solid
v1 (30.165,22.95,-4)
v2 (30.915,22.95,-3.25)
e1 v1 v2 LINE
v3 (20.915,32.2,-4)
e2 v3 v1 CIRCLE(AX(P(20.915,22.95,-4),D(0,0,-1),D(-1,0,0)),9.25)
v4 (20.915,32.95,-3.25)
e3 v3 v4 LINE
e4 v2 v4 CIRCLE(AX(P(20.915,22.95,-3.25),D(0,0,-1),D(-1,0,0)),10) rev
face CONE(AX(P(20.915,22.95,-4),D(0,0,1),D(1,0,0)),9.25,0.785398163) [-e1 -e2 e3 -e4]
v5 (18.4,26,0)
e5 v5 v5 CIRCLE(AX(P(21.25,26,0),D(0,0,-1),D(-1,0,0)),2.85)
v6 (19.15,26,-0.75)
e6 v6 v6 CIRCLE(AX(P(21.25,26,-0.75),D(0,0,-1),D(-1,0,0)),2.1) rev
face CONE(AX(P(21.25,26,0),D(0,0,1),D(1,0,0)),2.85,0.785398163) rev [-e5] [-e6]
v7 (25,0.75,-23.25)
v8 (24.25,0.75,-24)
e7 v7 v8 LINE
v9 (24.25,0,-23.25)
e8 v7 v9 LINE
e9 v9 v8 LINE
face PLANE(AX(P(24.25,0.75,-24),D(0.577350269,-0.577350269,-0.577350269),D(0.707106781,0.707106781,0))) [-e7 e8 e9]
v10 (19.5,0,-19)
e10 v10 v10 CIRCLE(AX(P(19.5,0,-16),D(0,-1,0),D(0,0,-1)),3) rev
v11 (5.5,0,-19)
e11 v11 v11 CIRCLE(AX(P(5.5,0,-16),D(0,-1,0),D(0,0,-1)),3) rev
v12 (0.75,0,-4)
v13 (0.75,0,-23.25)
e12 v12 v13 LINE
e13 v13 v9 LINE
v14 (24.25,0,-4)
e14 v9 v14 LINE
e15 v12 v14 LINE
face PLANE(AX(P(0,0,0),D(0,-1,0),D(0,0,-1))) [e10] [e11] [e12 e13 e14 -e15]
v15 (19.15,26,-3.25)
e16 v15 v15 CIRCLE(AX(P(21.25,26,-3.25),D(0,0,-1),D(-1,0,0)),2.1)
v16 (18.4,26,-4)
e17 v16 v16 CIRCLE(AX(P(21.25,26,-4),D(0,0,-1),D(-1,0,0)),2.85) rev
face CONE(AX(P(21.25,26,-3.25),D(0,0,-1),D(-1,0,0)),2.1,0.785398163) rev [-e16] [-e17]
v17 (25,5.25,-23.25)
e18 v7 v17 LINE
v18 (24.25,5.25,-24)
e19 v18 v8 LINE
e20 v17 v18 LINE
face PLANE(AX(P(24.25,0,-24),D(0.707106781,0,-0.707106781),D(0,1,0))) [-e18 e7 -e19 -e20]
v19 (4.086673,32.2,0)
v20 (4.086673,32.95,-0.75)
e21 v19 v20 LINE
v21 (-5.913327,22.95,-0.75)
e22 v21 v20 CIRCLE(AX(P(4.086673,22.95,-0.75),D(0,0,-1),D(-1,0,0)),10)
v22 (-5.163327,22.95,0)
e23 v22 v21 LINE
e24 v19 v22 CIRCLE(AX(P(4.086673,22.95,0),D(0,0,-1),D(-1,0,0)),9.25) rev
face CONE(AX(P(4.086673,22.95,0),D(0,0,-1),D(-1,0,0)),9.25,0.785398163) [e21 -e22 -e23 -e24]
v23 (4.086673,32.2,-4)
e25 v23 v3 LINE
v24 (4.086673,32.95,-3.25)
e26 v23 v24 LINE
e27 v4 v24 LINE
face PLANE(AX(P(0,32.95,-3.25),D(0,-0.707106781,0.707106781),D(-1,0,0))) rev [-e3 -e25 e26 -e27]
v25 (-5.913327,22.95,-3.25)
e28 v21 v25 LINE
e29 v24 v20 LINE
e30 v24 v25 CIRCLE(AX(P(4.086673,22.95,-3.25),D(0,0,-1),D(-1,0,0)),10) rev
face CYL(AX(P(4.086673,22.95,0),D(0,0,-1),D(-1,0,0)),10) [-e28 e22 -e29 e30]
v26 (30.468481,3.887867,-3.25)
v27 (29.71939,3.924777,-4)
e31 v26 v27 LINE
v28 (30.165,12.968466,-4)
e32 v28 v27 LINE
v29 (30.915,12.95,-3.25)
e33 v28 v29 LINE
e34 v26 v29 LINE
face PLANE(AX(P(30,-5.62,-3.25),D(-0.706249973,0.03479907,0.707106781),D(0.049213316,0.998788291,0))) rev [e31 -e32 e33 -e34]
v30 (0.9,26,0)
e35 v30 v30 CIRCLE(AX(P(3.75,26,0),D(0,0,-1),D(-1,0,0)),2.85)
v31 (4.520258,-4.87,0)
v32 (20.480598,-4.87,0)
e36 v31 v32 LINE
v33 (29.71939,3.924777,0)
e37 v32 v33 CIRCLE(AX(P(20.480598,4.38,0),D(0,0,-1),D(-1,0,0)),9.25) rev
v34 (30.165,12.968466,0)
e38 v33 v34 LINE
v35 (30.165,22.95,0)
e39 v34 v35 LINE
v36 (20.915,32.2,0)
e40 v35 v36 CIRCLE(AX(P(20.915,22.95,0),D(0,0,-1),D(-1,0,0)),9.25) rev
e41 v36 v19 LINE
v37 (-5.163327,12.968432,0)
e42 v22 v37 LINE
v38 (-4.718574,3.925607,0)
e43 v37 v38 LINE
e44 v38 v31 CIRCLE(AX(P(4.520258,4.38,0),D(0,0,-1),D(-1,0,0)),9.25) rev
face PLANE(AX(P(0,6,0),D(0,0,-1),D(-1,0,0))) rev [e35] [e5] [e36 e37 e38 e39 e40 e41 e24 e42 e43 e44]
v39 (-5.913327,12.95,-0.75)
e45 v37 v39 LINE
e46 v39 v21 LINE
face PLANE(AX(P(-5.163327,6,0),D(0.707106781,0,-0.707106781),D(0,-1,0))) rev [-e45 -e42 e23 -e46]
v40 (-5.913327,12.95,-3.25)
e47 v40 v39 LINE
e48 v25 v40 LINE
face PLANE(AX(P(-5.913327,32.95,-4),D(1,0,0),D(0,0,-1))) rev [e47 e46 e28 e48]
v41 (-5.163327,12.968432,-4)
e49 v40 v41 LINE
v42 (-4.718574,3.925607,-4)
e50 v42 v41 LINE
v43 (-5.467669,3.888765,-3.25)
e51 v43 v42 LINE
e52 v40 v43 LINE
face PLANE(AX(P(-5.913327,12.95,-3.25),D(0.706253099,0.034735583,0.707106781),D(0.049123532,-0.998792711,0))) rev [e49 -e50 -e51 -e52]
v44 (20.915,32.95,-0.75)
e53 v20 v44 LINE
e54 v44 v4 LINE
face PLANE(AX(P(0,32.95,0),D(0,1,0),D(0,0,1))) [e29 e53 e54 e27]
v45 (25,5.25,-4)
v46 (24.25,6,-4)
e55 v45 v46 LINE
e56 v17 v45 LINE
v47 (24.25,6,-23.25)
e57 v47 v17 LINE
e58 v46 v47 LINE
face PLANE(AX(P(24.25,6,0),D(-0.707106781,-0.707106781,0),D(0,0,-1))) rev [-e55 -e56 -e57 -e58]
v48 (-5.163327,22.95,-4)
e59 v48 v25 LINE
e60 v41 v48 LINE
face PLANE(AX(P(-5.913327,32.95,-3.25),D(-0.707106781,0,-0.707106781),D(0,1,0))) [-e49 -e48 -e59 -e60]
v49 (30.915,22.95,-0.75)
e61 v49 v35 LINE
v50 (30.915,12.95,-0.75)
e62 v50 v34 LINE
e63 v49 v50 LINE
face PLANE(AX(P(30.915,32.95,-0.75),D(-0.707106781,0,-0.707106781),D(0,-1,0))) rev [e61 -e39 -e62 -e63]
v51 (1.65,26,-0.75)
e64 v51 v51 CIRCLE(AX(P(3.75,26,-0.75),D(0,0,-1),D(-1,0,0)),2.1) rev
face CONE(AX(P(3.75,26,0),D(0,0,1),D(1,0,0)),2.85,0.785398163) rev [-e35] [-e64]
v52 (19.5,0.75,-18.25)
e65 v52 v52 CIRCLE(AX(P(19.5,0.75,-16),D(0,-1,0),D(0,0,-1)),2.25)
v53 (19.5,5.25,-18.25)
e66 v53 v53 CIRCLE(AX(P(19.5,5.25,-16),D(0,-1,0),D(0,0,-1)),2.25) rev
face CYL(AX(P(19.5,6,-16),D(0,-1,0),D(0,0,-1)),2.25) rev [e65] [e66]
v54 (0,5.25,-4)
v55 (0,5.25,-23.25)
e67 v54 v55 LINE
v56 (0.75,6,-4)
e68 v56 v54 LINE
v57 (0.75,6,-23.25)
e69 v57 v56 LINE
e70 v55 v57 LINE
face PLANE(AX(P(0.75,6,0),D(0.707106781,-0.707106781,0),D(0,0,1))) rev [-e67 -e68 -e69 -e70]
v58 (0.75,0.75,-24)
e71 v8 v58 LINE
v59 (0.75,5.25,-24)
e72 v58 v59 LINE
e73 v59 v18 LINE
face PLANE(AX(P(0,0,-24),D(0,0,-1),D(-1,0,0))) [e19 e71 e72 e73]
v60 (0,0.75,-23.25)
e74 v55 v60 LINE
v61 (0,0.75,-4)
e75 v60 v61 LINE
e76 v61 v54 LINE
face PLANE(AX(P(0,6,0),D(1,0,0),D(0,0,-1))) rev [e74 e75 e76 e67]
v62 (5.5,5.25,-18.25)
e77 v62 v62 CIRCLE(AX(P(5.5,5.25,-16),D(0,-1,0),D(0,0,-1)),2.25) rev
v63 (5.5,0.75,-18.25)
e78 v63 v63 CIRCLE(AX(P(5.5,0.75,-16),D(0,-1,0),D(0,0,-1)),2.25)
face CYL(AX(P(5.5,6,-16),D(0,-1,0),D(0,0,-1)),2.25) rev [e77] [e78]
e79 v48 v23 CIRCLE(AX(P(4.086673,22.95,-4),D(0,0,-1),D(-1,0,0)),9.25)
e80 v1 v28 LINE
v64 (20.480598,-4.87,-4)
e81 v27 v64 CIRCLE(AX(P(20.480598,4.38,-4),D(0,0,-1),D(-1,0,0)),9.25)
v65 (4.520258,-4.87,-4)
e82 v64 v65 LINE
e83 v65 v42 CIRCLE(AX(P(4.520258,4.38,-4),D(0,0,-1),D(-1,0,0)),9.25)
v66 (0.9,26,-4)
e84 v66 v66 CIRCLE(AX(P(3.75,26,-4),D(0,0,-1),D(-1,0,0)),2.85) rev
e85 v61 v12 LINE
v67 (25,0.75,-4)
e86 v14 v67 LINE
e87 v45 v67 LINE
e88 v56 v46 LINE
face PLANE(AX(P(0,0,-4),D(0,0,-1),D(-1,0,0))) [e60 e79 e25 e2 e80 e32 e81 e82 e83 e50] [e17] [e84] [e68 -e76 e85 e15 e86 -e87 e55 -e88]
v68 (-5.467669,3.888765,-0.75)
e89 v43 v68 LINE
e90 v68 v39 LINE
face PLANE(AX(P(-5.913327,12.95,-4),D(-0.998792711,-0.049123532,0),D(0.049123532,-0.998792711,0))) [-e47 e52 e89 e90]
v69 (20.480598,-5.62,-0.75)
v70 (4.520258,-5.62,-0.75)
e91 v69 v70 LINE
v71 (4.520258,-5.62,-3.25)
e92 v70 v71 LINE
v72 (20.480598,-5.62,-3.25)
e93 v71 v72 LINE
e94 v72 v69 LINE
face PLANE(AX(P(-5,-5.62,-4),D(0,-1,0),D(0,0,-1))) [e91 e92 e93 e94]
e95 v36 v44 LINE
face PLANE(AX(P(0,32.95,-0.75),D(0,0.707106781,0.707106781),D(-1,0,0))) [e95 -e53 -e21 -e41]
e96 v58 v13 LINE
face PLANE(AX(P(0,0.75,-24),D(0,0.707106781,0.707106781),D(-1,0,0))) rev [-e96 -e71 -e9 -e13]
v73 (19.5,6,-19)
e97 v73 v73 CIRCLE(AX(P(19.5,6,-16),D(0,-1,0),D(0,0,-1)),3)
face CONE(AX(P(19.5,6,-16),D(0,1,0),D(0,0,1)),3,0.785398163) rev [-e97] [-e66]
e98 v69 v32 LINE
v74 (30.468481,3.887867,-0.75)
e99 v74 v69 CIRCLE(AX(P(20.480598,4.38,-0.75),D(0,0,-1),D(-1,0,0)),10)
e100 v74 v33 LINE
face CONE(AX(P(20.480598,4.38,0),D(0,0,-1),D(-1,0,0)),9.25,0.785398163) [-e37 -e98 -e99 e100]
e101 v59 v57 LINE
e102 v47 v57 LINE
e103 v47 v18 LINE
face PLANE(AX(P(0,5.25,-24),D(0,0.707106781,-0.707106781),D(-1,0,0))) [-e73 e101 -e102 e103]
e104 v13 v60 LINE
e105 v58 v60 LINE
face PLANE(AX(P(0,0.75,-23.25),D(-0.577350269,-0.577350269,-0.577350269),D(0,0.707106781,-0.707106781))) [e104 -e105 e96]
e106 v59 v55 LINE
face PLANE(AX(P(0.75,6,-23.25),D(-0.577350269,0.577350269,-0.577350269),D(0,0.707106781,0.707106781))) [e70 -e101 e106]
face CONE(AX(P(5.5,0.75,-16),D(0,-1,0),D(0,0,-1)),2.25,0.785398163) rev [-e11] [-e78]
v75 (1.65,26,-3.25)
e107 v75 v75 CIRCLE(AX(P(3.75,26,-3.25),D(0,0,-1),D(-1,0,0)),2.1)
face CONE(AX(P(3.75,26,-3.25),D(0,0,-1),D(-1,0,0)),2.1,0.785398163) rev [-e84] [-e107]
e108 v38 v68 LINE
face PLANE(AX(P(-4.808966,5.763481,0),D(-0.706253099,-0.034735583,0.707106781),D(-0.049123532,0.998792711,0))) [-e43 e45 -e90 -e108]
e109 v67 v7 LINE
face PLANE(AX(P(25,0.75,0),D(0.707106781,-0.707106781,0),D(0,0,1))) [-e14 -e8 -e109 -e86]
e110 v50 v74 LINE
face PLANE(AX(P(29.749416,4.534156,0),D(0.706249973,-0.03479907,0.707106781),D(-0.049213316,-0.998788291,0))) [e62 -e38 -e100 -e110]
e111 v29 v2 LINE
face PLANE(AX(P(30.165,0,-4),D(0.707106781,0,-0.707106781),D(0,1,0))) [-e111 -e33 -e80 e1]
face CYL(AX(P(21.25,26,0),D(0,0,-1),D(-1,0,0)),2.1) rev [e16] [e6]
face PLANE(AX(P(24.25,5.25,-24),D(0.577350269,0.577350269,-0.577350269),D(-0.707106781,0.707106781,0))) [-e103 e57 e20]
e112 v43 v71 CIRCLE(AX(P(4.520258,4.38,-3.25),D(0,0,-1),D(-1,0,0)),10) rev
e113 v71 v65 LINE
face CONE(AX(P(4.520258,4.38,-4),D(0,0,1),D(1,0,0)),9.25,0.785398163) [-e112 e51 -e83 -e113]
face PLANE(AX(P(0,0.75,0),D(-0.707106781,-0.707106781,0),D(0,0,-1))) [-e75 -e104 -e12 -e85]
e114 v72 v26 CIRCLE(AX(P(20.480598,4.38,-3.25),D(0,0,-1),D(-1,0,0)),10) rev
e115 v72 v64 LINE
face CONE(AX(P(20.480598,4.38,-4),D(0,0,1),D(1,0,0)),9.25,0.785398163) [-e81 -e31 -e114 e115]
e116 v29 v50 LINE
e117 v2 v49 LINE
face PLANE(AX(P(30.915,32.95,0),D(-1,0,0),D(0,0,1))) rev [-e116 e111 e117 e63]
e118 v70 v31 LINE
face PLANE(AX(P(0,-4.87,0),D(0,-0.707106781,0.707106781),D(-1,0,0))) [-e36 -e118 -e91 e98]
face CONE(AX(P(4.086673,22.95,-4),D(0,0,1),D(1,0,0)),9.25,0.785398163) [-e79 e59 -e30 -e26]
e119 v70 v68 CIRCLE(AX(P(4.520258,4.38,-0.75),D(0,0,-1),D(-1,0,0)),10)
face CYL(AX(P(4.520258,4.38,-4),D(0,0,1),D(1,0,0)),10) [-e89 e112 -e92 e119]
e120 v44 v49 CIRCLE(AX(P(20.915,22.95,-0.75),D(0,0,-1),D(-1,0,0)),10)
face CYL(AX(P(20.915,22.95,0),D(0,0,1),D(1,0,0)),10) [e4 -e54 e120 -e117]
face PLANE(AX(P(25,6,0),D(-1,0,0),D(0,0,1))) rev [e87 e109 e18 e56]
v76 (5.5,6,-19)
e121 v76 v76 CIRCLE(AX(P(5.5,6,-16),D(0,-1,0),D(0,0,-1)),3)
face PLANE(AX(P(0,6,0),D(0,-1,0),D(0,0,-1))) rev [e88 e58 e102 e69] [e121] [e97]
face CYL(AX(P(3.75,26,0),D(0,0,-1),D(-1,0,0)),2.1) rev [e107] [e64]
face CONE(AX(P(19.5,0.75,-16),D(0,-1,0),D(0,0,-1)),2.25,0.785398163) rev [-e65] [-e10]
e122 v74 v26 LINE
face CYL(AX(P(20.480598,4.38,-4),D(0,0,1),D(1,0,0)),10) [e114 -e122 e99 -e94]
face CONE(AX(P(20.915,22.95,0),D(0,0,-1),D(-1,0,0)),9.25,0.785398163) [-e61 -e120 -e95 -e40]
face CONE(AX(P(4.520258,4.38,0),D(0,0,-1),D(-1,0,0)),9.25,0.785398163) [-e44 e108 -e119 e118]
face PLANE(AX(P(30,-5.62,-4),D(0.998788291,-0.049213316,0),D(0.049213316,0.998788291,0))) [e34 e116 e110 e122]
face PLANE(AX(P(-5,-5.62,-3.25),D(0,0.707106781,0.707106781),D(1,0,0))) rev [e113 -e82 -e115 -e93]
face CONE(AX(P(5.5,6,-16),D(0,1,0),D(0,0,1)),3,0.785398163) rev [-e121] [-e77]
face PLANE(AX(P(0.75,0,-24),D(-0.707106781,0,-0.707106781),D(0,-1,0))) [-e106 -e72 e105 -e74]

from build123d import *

# Parameters (mm, degrees)
SKETCH1_W           = 25
SKETCH1_H           = 25
BOSS_EXTRUDE1_DEPTH = 6
BOSS_EXTRUDE3_DEPTH = 4
SKETCH2_R           = 2.25
CUT_EXTRUDE1_DEPTH  = 6
SKETCH9_W           = 25
SKETCH9_H           = 6
CUT_EXTRUDE2_DEPTH  = 1
SKETCH11_W          = 36.82832664
SKETCH11_H          = 4
BOSS_EXTRUDE4_DEPTH = 20
SKETCH13_R          = 2.1
CUT_EXTRUDE3_DEPTH  = 50.410927182
FILLET2_R           = 10
CHAMFER1_SIZE       = 0.75
CHAMFER2_SIZE       = 0.75
CHAMFER3_SIZE       = 0.75


with BuildPart() as part:
    # Sketch1 → Boss-Extrude1 (new body)
    with BuildSketch(Plane(origin=(0, 0, 0), x_dir=(1, 0, 0), z_dir=(0, 1, 0))):
        with Locations((12.5, 12.5)):
            Rectangle(SKETCH1_W, SKETCH1_H)
    extrude(amount=BOSS_EXTRUDE1_DEPTH)

    # Sketch5 → Boss-Extrude3 (add)
    with BuildSketch(Plane.XY):
        Polygon((-5.91332664, 12.95), (30.915, 12.95), (30, -5.62), (-5, -5.62), align=None)
    extrude(amount=-BOSS_EXTRUDE3_DEPTH)

    # Sketch2 → Cut-Extrude1 (cut)
    with BuildSketch(Plane.XZ):
        with Locations(Location((5.5, -16, 0), (0, 0, 270))):
            Circle(SKETCH2_R)
        with Locations(Location((19.5, -16, 0), (0, 0, 90))):
            Circle(SKETCH2_R)
    extrude(amount=-CUT_EXTRUDE1_DEPTH, mode=Mode.SUBTRACT)

    # Sketch9 → Cut-Extrude2 (cut)
    with BuildSketch(Plane(origin=(0, 0, -25), x_dir=(-1, 0, 0), z_dir=(0, 0, -1))):
        with Locations((-12.5, 3)):
            Rectangle(SKETCH9_W, SKETCH9_H)
    extrude(amount=-CUT_EXTRUDE2_DEPTH, mode=Mode.SUBTRACT)

    # Sketch11 → Boss-Extrude4 (add)
    with BuildSketch(Plane(origin=(0, 12.95, 0), x_dir=(1, 0, 0), z_dir=(0, 1, 0))):
        with Locations((12.50083668, 2)):
            Rectangle(SKETCH11_W, SKETCH11_H)
    extrude(amount=BOSS_EXTRUDE4_DEPTH)

    # Sketch13 → Cut-Extrude3 (cut, through all)
    with BuildSketch(Plane(origin=(0, 0, -4), x_dir=(-1, 0, 0), z_dir=(0, 0, -1))):
        with Locations((-21.25, 26)):
            Circle(SKETCH13_R)
        with Locations((-3.75, 26)):
            Circle(SKETCH13_R)
    extrude(amount=-CUT_EXTRUDE3_DEPTH, mode=Mode.SUBTRACT)

    # Fillet2
    fillet2_edges = [part.edges().sort_by_distance(p)[0] for p in [
        (30, -5.62, -2),
        (-5, -5.62, -2),
        (-5.91332664, 32.95, -2),
        (30.915, 32.95, -2),
    ]]
    fillet(fillet2_edges, radius=FILLET2_R)

    # Chamfer1
    # the kernel refuses this chamfer: 0.75 mm, written as the material it takes off along each edge
    with BuildSketch(Plane(origin=(20.480598416, -5.62, 0), x_dir=(0, 0.9996219169112968, 0.02749587661058636), z_dir=(-1, 0, 0)), Plane(origin=(20.480598416, -5.62, -4), x_dir=(0, -0.02749587661058678, 0.9996219169112968), z_dir=(-1, 0, 0))) as chamfer1_piece_1:
        Polygon((CHAMFER1_SIZE * 0.999621916911, CHAMFER1_SIZE * 0.0274958766106), (-CHAMFER1_SIZE * 0.0274958766106, CHAMFER1_SIZE * 0.999621916911), (0, 0), align=None)
    extrude(amount=15.960340029, mode=Mode.SUBTRACT)
    with BuildSketch(Plane(origin=(31.009920786, 14.876425142, 0), x_dir=(-0.9984106656617833, 0.04919470969738991, 0.027495876610586206), z_dir=(-0.04921331642006734, -0.9987882906236629, 0)), Plane(origin=(31.009920786, 14.876425142, -4), x_dir=(0.027462559599087527, -0.0013531632758839558, 0.9996219169112968), z_dir=(-0.04921331642006734, -0.9987882906236629, 0))) as chamfer1_piece_2:
        Polygon((CHAMFER1_SIZE * 0.999621916911, CHAMFER1_SIZE * 0.0274958766106), (-CHAMFER1_SIZE * 0.0274958766106, CHAMFER1_SIZE * 0.999621916911), (0, 0), align=None)
    extrude(amount=11.001889398, mode=Mode.SUBTRACT)
    with BuildSketch(Plane(origin=(30.915, 11.021237759, 0), x_dir=(-0.9996219169112968, 0, 0.02749587661058636), z_dir=(0, 1, 0)), Plane(origin=(30.915, 11.021237759, -4), x_dir=(0.02749587661058678, 0, 0.9996219169112968), z_dir=(0, 1, 0))) as chamfer1_piece_3:
        Polygon((CHAMFER1_SIZE * 0.999621916911, -CHAMFER1_SIZE * 0.0274958766106), (-CHAMFER1_SIZE * 0.0274958766106, -CHAMFER1_SIZE * 0.999621916911), (0, 0), align=None)
    extrude(amount=11.928762241, mode=Mode.SUBTRACT)
    with BuildSketch(Plane(origin=(4.08667336, 32.95, 0), x_dir=(0, -0.9996219169112968, 0.027495876610586487), z_dir=(1, 0, 0))) as chamfer1_piece_4:
        Polygon((CHAMFER1_SIZE * 0.999621916911, CHAMFER1_SIZE * 0.0274958766106), (-CHAMFER1_SIZE * 0.0274958766106, CHAMFER1_SIZE * 0.999621916911), (0, 0), align=None)
    extrude(amount=16.82832664, mode=Mode.SUBTRACT)
    with BuildSketch(Plane(origin=(-5.91332664, 11.021237759, 0), x_dir=(0.9996219169112968, 0, 0.02749587661058636), z_dir=(0, 1, 0)), Plane(origin=(-5.91332664, 11.021237759, -4), x_dir=(-0.02749587661058678, 0, 0.9996219169112968), z_dir=(0, 1, 0))) as chamfer1_piece_5:
        Polygon((CHAMFER1_SIZE * 0.999621916911, CHAMFER1_SIZE * 0.0274958766106), (-CHAMFER1_SIZE * 0.0274958766106, CHAMFER1_SIZE * 0.999621916911), (0, 0), align=None)
    extrude(amount=11.928762241, mode=Mode.SUBTRACT)
    with BuildSketch(Plane(origin=(20.915, 22.95, 0), x_dir=(1, 0, 0), z_dir=(0, -1, 0))) as chamfer1_piece_6:
        Polygon((10 - CHAMFER1_SIZE, 0), (10, -CHAMFER1_SIZE), (10, 0), align=None)
    revolve(axis=Axis((20.915, 22.95, 0), (0, 0, 1)), revolution_arc=90, mode=Mode.SUBTRACT)
    with BuildSketch(Plane(origin=(4.08667336, 22.95, 0), x_dir=(0, 1, 0), z_dir=(1, 0, 0))) as chamfer1_piece_7:
        Polygon((10 - CHAMFER1_SIZE, 0), (10, -CHAMFER1_SIZE), (10, 0), align=None)
    revolve(axis=Axis((4.08667336, 22.95, 0), (0, 0, 1)), revolution_arc=90, mode=Mode.SUBTRACT)
    with BuildSketch(Plane(origin=(4.520258387, 4.38, 0), x_dir=(0, -1, 0), z_dir=(1, 0, 0))) as chamfer1_piece_8:
        Polygon((10 - CHAMFER1_SIZE, 0), (10, CHAMFER1_SIZE), (10, 0), align=None)
    revolve(axis=Axis((4.520258387, 4.38, 0), (0, 0, -1)), revolution_arc=87.184295724, mode=Mode.SUBTRACT)
    with BuildSketch(Plane(origin=(20.480598416, 4.38, 0), x_dir=(0.9987882906236628, -0.04921331642006739, 0), z_dir=(0.04921331642006739, 0.9987882906236628, 0))) as chamfer1_piece_9:
        Polygon((10 - CHAMFER1_SIZE, 0), (10, CHAMFER1_SIZE), (10, 0), align=None)
    revolve(axis=Axis((20.480598416, 4.38, 0), (0, 0, -1)), revolution_arc=87.179145229, mode=Mode.SUBTRACT)
    with BuildSketch(Plane(origin=(20.915, 32.95, -4), x_dir=(0, 0.02749587661058218, 0.9996219169112969), z_dir=(-1, 0, 0))) as chamfer1_piece_10:
        Polygon((CHAMFER1_SIZE * 0.999621916911, -CHAMFER1_SIZE * 0.0274958766106), (-CHAMFER1_SIZE * 0.0274958766106, -CHAMFER1_SIZE * 0.999621916911), (0, 0), align=None)
    extrude(amount=16.82832664, mode=Mode.SUBTRACT)
    with BuildSketch(Plane(origin=(20.915, 22.95, -4), x_dir=(1, 0, 0), z_dir=(0, -1, 0))) as chamfer1_piece_11:
        Polygon((10, CHAMFER1_SIZE), (10 - CHAMFER1_SIZE, 0), (10, 0), align=None)
    revolve(axis=Axis((20.915, 22.95, -4), (0, 0, 1)), revolution_arc=90, mode=Mode.SUBTRACT)
    with BuildSketch(Plane(origin=(4.08667336, 22.95, -4), x_dir=(0, 1, 0), z_dir=(1, 0, 0))) as chamfer1_piece_12:
        Polygon((10, CHAMFER1_SIZE), (10 - CHAMFER1_SIZE, 0), (10, 0), align=None)
    revolve(axis=Axis((4.08667336, 22.95, -4), (0, 0, 1)), revolution_arc=90, mode=Mode.SUBTRACT)
    with BuildSketch(Plane(origin=(4.520258387, 4.38, -4), x_dir=(0, -1, 0), z_dir=(1, 0, 0))) as chamfer1_piece_13:
        Polygon((10, -CHAMFER1_SIZE), (10 - CHAMFER1_SIZE, 0), (10, 0), align=None)
    revolve(axis=Axis((4.520258387, 4.38, -4), (0, 0, -1)), revolution_arc=87.184295724, mode=Mode.SUBTRACT)
    with BuildSketch(Plane(origin=(20.480598416, 4.38, -4), x_dir=(0.9987882906236628, -0.04921331642006739, 0), z_dir=(0.04921331642006739, 0.9987882906236628, 0))) as chamfer1_piece_14:
        Polygon((10, -CHAMFER1_SIZE), (10 - CHAMFER1_SIZE, 0), (10, 0), align=None)
    revolve(axis=Axis((20.480598416, 4.38, -4), (0, 0, -1)), revolution_arc=87.179145229, mode=Mode.SUBTRACT)
    with BuildSketch(Plane(origin=(-5.467668718, 3.888764679, 0), x_dir=(0.998415083892051, 0.049104959283599446, 0.027495876610586386), z_dir=(-0.04912353206032882, 0.9987927105250207, 0)), Plane(origin=(-5.467668718, 3.888764679, -4), x_dir=(-0.02746268112814937, -0.0013506945762069992, 0.9996219169112968), z_dir=(-0.04912353206032882, 0.9987927105250207, 0))) as chamfer1_piece_15:
        Polygon((CHAMFER1_SIZE * 0.999621916911, CHAMFER1_SIZE * 0.0274958766106), (-CHAMFER1_SIZE * 0.0274958766106, CHAMFER1_SIZE * 0.999621916911), (0, 0), align=None)
    extrude(amount=11.000950319, mode=Mode.SUBTRACT)
    with BuildSketch(Plane(origin=(21.25, 26, 0), x_dir=(-1, 0, 0), z_dir=(0, -1, 0))) as chamfer1_piece_16:
        Polygon((2.1 + CHAMFER1_SIZE, 0), (2.1, CHAMFER1_SIZE), (2.1, 0), align=None)
    revolve(axis=Axis((21.25, 26, 0), (0, 0, -1)), mode=Mode.SUBTRACT)
    with BuildSketch(Plane(origin=(21.25, 26, -4), x_dir=(-1, 0, 0), z_dir=(0, -1, 0))) as chamfer1_piece_17:
        Polygon((2.1, -CHAMFER1_SIZE), (2.1 + CHAMFER1_SIZE, 0), (2.1, 0), align=None)
    revolve(axis=Axis((21.25, 26, -4), (0, 0, -1)), mode=Mode.SUBTRACT)
    with BuildSketch(Plane(origin=(3.75, 26, 0), x_dir=(-1, 0, 0), z_dir=(0, -1, 0))) as chamfer1_piece_18:
        Polygon((2.1 + CHAMFER1_SIZE, 0), (2.1, CHAMFER1_SIZE), (2.1, 0), align=None)
    revolve(axis=Axis((3.75, 26, 0), (0, 0, -1)), mode=Mode.SUBTRACT)
    with BuildSketch(Plane(origin=(3.75, 26, -4), x_dir=(-1, 0, 0), z_dir=(0, -1, 0))) as chamfer1_piece_19:
        Polygon((2.1, -CHAMFER1_SIZE), (2.1 + CHAMFER1_SIZE, 0), (2.1, 0), align=None)
    revolve(axis=Axis((3.75, 26, -4), (0, 0, -1)), mode=Mode.SUBTRACT)

    # Chamfer2
    chamfer2_edges = [part.edges().sort_by_distance(p)[0] for p in [
        (5.5, 6, -13.75),
        (5.5, 0, -13.75),
        (19.5, 6, -18.25),
        (19.5, 0, -18.25),
    ]]
    chamfer(chamfer2_edges, length=CHAMFER2_SIZE)

    # Chamfer3
    chamfer3_edges = [part.edges().sort_by_distance(p)[0] for p in [
        (25, 0, -14),
        (25, 6, -14),
        (0, 0, -14),
        (0, 6, -14),
        (25, 3, -24),
        (12.5, 6, -24),
        (0, 3, -24),
        (12.5, 0, -24),
    ]]
    chamfer(chamfer3_edges, length=CHAMFER3_SIZE)


solid = part.part
